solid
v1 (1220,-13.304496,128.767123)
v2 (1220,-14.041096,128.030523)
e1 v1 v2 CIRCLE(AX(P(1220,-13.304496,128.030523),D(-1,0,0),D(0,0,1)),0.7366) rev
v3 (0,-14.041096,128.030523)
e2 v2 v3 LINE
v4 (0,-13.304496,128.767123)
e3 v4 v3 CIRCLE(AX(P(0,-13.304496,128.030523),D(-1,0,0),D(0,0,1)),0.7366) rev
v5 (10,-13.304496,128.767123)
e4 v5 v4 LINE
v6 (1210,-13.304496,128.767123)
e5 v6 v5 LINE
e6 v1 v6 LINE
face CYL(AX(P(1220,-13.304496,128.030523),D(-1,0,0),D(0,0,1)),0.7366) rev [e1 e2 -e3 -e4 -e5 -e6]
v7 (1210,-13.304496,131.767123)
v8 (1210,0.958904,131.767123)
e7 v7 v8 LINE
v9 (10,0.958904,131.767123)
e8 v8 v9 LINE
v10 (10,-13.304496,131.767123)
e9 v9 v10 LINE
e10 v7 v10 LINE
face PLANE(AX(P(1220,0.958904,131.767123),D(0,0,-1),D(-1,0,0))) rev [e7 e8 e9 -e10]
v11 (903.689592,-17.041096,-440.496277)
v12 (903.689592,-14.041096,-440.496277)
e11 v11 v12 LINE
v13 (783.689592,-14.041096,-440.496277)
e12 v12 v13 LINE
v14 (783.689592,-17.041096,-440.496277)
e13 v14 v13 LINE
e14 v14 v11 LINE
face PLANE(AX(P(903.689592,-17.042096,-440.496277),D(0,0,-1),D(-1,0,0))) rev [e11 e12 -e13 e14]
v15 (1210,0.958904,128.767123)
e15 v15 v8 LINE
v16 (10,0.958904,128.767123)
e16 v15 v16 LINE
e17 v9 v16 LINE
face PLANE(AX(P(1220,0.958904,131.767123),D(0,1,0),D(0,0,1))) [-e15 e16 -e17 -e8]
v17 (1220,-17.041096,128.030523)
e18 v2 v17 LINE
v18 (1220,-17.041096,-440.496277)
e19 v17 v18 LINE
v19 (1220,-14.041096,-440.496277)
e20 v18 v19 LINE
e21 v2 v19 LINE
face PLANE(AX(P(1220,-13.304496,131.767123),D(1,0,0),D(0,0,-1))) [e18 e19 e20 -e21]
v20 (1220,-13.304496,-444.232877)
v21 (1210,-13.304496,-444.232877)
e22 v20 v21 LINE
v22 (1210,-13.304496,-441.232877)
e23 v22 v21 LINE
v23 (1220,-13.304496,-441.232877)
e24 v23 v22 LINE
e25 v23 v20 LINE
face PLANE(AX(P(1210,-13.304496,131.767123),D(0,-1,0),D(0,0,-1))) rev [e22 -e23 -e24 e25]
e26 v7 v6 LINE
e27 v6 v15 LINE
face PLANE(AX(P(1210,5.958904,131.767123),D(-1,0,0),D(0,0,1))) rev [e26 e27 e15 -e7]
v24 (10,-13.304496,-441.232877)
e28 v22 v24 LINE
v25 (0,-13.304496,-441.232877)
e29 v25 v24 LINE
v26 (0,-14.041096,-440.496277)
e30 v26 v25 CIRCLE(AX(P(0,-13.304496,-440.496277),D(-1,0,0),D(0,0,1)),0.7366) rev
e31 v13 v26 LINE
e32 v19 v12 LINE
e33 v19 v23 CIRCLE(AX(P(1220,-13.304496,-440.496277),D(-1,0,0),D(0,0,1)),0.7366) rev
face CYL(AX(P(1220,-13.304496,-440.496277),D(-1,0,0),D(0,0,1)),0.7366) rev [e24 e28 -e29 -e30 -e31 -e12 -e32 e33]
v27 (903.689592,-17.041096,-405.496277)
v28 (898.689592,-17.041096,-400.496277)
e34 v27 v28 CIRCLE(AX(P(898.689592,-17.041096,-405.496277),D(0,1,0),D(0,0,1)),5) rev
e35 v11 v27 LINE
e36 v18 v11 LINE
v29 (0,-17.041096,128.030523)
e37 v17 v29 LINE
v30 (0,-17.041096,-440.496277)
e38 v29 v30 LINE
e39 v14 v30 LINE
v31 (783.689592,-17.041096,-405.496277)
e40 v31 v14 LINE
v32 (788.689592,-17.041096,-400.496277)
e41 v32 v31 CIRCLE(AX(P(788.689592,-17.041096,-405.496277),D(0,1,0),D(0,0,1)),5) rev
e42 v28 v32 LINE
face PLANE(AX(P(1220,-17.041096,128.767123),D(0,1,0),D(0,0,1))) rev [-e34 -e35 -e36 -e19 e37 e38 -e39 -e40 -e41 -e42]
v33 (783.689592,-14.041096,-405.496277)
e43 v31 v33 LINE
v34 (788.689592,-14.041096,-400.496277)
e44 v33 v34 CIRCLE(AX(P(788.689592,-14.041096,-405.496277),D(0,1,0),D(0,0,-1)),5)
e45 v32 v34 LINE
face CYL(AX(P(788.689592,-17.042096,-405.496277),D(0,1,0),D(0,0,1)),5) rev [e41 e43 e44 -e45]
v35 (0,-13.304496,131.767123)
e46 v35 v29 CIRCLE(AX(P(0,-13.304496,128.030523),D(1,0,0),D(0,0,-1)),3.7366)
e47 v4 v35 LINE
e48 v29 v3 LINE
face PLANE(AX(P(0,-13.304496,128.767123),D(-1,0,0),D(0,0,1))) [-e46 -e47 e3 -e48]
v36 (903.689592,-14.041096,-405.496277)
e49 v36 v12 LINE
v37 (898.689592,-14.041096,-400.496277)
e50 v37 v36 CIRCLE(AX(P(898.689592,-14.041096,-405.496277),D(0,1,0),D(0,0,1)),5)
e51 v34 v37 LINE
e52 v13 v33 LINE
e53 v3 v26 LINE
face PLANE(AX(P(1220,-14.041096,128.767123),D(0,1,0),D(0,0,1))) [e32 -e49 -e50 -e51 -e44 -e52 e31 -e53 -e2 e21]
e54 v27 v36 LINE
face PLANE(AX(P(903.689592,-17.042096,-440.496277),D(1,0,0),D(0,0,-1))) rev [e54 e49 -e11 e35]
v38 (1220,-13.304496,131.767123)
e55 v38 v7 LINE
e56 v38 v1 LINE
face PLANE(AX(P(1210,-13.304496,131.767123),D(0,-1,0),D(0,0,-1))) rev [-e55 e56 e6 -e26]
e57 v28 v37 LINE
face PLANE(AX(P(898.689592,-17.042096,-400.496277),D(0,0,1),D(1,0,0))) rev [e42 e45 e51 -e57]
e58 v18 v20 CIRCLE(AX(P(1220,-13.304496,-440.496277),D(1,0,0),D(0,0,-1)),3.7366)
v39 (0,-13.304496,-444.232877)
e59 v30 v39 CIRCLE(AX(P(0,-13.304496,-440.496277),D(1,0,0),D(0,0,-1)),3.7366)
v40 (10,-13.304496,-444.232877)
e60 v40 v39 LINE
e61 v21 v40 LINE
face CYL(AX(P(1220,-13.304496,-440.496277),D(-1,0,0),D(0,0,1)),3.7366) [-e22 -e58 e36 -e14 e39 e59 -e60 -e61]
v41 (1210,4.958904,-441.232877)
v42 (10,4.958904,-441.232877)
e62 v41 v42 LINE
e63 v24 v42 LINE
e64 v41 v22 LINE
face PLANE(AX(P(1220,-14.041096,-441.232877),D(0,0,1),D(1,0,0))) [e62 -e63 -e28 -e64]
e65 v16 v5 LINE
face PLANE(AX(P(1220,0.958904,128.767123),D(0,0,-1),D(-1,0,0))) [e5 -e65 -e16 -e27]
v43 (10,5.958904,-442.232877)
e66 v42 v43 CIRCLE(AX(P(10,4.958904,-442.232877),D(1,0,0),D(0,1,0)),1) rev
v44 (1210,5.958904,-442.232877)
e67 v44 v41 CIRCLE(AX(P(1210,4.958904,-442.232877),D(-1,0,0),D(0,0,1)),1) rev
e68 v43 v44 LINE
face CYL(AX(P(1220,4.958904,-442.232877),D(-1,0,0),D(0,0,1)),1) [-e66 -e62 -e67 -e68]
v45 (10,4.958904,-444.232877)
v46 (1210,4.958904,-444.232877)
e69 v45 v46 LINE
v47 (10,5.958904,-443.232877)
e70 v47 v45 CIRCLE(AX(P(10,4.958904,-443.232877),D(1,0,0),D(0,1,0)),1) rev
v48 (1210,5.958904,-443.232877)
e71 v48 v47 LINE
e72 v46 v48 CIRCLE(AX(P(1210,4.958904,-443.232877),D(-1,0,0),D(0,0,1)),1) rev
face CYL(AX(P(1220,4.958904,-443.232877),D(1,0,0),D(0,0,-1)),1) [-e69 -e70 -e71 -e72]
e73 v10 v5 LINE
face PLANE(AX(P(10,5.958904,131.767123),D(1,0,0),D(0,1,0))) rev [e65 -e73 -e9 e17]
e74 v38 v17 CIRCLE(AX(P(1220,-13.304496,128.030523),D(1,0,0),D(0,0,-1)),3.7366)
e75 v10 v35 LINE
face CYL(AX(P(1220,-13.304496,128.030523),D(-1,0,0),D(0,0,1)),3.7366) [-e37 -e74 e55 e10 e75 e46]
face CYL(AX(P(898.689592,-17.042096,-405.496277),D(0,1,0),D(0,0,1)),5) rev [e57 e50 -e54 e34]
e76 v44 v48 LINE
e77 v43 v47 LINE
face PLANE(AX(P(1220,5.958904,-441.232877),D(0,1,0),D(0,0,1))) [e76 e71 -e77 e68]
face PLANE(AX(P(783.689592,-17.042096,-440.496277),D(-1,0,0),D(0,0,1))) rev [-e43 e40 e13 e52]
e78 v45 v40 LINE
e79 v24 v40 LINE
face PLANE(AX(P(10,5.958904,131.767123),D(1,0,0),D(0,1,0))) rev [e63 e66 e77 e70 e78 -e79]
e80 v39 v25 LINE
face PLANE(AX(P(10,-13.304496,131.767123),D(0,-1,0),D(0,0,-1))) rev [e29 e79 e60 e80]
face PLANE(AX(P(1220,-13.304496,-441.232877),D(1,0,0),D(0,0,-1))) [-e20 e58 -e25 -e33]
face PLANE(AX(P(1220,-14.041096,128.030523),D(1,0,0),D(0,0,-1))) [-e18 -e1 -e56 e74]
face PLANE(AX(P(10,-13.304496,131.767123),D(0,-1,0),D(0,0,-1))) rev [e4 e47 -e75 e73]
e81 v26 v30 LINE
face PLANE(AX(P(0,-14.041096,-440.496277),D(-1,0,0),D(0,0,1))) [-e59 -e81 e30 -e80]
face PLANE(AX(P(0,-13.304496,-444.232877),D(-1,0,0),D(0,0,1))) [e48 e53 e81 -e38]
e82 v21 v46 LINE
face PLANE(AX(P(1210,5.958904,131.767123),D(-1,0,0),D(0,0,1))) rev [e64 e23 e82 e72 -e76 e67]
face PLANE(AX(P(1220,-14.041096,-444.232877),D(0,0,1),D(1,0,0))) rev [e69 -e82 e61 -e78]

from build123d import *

# Parameters (mm, degrees)
BASE_FLANGE1_DEPTH = 1220
SKETCH6_W          = 10
SKETCH6_H          = 19.2634
CUT_EXTRUDE1_DEPTH = 1350.246604201
CUT_EXTRUDE2_REACH = 1300.516
FILLET1_R          = 1


# Sheet-metal steps are written as plain solids
with BuildPart() as part:
    # Sketch1 → Base-Flange1 (new body)
    with BuildSketch(Plane(origin=(0, 0, 0), x_dir=(0, 0, -1), z_dir=(1, 0, 0))):
        with BuildLine():
            Line((-128.767123288, 0.95890411), (-128.767123288, -13.30449589))
            ThreePointArc((-128.767123288, -13.30449589), (-128.551378143, -13.825350745), (-128.030523288, -14.04109589))
            Line((-128.030523288, -14.04109589), (440.496276712, -14.04109589))
            ThreePointArc((440.496276712, -14.04109589), (441.017131567, -13.825350745), (441.232876712, -13.30449589))
            Line((441.232876712, -13.30449589), (441.232876712, 5.95890411))
            Line((441.232876712, 5.95890411), (444.232876712, 5.95890411))
            Line((444.232876712, 5.95890411), (444.232876712, -13.30449589))
            ThreePointArc((444.232876712, -13.30449589), (443.138451911, -15.946671089), (440.496276712, -17.04109589))
            Line((440.496276712, -17.04109589), (-128.030523288, -17.04109589))
            ThreePointArc((-128.030523288, -17.04109589), (-130.672698486, -15.946671089), (-131.767123288, -13.30449589))
            Line((-131.767123288, -13.30449589), (-131.767123288, 0.95890411))
            Line((-131.767123288, 0.95890411), (-128.767123288, 0.95890411))
        make_face()
    extrude(amount=BASE_FLANGE1_DEPTH)

    # Sketch6 → Cut-Extrude1 (cut, through all)
    with BuildSketch(Plane(origin=(0, 0, -444.232876712), x_dir=(-1, 0, 0), z_dir=(0, 0, -1))):
        with Locations((-1215, -3.67279589)):
            Rectangle(SKETCH6_W, SKETCH6_H)
        with Locations((-5, -3.67279589)):
            Rectangle(SKETCH6_W, SKETCH6_H)
    extrude(amount=-CUT_EXTRUDE1_DEPTH, mode=Mode.SUBTRACT)

    # Sketch8 → Cut-Extrude2 (cut, up to next)
    with BuildSketch(Plane(origin=(0, -14.04109589, 0), x_dir=(1, 0, 0), z_dir=(0, 1, 0)), mode=Mode.PRIVATE) as cut_extrude2_sk1:
        with BuildLine():
            Line((903.689592114, 440.496276712), (783.689592114, 440.496276712))
            Line((783.689592114, 440.496276712), (783.689592114, 405.496276712))
            ThreePointArc((783.689592114, 405.496276712), (785.154058208, 401.960742806), (788.689592114, 400.496276712))
            Line((788.689592114, 400.496276712), (898.689592114, 400.496276712))
            ThreePointArc((898.689592114, 400.496276712), (902.22512602, 401.960742806), (903.689592114, 405.496276712))
            Line((903.689592114, 405.496276712), (903.689592114, 440.496276712))
        make_face()
    cut_extrude2_tool1 = extrude(cut_extrude2_sk1.sketch, amount=-CUT_EXTRUDE2_REACH, mode=Mode.PRIVATE) & part.part
    add(cut_extrude2_tool1.solids().sort_by_distance((843.689592, -14.041096, -420.538583))[0], mode=Mode.SUBTRACT)

    # Fillet1
    fillet1_edges = [part.edges().sort_by_distance(p)[0] for p in [
        (610, 5.95890411, -441.232876712),
        (610, 5.95890411, -444.232876712),
    ]]
    fillet(fillet1_edges, radius=FILLET1_R)


solid = part.part
